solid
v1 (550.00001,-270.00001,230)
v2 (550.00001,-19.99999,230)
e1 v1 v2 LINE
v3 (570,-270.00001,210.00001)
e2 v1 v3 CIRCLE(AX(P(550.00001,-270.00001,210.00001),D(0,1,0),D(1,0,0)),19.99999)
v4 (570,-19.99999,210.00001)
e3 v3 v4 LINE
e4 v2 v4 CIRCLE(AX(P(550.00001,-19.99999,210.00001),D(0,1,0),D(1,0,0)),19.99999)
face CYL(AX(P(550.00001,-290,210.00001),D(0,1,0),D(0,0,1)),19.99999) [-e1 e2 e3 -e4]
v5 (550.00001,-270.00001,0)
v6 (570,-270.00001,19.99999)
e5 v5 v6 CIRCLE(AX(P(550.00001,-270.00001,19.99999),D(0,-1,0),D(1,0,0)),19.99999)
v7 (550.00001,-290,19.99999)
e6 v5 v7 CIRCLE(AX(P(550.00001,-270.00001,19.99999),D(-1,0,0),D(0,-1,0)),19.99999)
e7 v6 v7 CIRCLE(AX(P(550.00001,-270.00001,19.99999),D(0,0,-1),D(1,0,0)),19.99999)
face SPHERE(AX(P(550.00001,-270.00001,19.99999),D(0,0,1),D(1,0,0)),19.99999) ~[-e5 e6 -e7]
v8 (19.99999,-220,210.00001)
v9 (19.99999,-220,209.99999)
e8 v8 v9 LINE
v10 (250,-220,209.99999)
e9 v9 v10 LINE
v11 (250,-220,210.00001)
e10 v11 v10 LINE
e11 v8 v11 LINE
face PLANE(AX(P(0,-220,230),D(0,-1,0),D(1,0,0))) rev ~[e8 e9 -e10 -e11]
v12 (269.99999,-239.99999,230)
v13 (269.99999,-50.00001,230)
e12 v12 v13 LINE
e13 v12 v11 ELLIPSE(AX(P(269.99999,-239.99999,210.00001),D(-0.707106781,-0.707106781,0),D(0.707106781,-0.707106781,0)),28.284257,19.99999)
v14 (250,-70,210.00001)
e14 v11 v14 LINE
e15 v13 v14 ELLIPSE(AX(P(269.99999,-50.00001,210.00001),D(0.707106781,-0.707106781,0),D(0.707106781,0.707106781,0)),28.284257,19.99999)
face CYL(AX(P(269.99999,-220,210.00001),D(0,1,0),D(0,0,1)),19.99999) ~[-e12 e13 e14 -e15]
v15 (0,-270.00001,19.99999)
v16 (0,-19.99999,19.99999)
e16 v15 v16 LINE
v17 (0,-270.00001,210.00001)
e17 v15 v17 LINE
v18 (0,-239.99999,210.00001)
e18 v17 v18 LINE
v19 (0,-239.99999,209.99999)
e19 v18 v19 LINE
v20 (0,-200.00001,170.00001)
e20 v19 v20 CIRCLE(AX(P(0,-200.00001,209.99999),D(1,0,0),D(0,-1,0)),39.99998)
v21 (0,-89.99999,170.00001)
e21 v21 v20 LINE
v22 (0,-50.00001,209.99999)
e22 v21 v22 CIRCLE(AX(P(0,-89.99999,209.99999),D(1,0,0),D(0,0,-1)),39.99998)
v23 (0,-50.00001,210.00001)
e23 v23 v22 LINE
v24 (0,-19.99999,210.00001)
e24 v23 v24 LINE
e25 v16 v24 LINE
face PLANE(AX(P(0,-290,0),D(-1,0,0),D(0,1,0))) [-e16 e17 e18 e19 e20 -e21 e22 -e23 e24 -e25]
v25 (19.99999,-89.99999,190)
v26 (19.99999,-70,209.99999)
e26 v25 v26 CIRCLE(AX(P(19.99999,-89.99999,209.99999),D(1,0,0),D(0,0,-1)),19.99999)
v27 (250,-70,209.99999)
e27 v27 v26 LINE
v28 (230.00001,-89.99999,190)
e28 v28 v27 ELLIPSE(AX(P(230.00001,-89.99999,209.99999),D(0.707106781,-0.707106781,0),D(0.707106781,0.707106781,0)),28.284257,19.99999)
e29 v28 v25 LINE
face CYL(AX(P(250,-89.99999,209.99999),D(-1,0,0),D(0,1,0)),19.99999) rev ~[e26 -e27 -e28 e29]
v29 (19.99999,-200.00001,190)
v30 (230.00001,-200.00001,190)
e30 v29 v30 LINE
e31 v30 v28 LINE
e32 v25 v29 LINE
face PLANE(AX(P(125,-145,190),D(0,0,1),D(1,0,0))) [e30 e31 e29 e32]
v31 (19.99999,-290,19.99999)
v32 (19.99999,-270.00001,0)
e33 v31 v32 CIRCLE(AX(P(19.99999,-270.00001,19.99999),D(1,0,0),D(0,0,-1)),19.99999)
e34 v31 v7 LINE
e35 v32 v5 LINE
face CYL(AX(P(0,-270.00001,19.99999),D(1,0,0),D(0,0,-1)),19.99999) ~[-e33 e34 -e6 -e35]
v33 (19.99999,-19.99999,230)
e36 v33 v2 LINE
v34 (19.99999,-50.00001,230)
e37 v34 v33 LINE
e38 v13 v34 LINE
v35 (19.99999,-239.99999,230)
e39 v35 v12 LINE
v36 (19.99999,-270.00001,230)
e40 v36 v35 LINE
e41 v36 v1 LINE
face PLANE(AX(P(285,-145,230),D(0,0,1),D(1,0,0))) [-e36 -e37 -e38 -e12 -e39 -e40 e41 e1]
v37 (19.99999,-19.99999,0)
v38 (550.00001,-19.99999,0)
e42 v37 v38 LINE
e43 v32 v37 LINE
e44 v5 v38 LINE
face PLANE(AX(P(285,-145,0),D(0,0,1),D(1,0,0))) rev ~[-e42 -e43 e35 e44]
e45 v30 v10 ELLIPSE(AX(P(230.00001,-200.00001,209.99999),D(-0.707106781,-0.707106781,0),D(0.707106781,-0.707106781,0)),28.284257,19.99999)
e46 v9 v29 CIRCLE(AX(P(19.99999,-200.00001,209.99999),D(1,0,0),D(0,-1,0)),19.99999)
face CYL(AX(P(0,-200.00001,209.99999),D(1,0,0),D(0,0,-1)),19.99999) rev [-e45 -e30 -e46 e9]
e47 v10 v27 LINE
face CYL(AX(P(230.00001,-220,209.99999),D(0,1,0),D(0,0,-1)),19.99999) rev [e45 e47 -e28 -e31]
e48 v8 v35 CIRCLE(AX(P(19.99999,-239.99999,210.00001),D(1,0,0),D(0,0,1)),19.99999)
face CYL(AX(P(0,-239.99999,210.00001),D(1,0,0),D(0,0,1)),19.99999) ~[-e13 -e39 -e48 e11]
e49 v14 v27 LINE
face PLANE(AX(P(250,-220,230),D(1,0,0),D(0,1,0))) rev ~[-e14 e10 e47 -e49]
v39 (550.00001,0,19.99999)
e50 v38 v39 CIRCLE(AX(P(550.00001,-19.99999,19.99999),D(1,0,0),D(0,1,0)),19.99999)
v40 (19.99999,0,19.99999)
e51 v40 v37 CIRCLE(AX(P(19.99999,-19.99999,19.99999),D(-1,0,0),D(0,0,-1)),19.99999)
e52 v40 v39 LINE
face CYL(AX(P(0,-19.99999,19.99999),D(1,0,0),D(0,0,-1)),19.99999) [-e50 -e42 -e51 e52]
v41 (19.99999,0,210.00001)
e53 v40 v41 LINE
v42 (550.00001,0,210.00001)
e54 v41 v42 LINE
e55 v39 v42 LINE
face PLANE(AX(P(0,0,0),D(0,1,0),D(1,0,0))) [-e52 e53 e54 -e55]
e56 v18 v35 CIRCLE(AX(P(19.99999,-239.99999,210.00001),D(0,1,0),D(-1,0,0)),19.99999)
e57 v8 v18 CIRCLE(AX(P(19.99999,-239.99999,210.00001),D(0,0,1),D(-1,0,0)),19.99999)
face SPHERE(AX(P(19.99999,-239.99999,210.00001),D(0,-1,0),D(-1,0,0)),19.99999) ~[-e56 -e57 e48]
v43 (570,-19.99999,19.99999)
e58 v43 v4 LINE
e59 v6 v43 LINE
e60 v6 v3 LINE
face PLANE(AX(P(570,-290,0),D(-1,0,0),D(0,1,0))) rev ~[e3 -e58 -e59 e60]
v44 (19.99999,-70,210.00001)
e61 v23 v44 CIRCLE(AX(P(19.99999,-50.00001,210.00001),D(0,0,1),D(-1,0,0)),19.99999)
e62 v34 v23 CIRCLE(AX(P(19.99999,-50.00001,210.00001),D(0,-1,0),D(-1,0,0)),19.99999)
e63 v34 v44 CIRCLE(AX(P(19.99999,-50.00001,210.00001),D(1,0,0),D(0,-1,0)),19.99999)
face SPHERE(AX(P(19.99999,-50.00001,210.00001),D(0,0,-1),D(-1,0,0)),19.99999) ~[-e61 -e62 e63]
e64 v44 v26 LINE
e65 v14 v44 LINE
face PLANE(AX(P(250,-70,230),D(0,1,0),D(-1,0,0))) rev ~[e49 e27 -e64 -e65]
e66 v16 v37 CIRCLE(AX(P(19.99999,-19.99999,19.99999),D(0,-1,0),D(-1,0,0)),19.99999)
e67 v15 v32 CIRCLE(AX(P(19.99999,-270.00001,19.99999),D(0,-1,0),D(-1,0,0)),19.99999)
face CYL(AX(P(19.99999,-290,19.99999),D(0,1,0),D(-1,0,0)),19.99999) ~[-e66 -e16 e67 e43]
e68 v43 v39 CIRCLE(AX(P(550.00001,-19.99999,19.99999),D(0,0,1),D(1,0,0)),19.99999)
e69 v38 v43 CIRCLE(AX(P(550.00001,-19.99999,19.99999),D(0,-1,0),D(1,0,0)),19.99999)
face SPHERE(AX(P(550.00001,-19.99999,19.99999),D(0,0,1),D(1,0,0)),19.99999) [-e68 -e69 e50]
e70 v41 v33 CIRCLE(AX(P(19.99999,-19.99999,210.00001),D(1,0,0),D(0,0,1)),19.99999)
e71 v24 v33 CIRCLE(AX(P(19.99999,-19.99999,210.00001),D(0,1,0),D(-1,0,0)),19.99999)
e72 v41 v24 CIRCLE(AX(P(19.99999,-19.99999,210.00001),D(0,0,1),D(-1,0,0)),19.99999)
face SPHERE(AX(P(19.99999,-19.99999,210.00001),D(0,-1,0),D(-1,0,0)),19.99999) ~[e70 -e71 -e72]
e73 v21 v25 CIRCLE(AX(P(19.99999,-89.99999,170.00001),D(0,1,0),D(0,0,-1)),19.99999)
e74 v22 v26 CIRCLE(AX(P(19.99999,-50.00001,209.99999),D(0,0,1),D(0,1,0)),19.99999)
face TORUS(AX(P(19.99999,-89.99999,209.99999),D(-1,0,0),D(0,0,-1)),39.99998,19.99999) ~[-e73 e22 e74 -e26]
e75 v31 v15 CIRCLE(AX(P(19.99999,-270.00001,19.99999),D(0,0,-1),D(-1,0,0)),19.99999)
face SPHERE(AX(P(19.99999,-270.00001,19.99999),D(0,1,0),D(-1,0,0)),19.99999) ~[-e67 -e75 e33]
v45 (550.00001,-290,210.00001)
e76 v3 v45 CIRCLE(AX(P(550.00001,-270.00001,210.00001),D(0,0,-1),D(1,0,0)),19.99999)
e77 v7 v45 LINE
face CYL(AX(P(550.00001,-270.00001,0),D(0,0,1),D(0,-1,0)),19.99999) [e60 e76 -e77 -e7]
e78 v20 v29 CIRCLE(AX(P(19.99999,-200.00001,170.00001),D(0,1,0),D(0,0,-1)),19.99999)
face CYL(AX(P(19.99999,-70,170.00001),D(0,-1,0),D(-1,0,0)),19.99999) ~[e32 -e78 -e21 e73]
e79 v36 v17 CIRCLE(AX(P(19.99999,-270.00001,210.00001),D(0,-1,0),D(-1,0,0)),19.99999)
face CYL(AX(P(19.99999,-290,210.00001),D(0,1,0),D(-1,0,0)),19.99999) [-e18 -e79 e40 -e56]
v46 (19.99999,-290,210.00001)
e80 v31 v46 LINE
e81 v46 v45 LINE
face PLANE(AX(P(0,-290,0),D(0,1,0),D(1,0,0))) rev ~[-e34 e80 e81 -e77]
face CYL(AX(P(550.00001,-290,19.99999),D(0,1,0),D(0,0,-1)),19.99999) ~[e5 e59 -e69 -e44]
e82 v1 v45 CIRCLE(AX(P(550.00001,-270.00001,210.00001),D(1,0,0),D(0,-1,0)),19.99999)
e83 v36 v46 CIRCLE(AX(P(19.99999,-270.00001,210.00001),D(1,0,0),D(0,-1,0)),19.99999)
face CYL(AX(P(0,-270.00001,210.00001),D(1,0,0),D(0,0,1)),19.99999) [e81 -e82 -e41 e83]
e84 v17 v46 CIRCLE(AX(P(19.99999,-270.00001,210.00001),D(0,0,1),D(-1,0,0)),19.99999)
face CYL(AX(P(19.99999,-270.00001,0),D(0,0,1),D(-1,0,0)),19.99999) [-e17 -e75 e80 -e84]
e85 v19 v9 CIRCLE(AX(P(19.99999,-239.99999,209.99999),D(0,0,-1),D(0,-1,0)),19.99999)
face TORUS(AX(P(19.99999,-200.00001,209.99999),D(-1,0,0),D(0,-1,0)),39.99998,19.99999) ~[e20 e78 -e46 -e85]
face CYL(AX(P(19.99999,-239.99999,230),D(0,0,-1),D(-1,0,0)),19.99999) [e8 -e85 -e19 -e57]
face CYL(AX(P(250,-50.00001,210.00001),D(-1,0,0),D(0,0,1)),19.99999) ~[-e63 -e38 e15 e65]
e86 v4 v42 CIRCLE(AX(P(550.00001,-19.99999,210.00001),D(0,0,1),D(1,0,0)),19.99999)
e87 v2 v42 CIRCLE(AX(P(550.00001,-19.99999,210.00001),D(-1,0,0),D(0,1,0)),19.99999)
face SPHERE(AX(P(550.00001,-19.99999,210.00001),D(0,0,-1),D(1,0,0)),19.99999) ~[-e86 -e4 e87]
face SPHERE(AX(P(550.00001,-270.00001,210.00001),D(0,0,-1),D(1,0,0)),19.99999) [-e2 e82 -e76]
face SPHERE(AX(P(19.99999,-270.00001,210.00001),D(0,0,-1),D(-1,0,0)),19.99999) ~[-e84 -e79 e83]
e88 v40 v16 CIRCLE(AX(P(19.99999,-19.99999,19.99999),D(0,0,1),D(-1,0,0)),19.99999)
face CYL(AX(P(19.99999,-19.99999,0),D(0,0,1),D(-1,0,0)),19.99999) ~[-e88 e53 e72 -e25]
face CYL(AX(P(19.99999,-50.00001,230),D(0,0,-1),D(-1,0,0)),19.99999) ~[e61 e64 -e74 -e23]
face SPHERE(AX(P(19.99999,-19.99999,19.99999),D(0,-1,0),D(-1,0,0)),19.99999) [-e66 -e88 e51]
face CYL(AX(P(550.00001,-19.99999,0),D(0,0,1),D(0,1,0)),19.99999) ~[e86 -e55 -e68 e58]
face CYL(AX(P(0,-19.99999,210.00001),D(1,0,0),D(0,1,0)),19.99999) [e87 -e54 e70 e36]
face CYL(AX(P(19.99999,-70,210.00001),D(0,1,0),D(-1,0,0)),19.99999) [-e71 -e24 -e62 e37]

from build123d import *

# Parameters (mm, degrees)
F0_W     = 570
F0_H     = 290
F1_DEPTH = 230
F3_DEPTH = 40
F4_R     = 19.99999


# Not quite as in the source:
# - a fillet or chamfer is up to 0.001 mm smaller than in the source, because OpenCascade refuses the exact size
# - a feature of the source that left no trace in its solid (it failed there, or was rolled back) is left out


with BuildPart() as f1:
    # F0 (on Top) → F1 (new body)
    with BuildSketch(Plane.XY):
        with Locations((285, -145)):
            Rectangle(F0_W, F0_H)
    extrude(amount=F1_DEPTH)

    # F2 (on face) → F3 (cut)
    with BuildSketch(Plane.XY.offset(230)):
        Polygon((0, -220), (250, -220), (250, -145), (250, -70), (0, -70), (0, -145), align=None)
    extrude(amount=-F3_DEPTH, mode=Mode.SUBTRACT)

    # F4 (radius 20 in the source; OpenCascade refuses exactly that, so slightly less here)
    f4_edges = [f1.edges().sort_by_distance(p)[0] for p in [
        (0, -145, 0),
        (0, -290, 115),
        (0, -255, 230),
        (0, -220, 210),
        (0, -145, 190),
        (0, -70, 210),
        (0, -35, 230),
        (0, 0, 115),
        (570, -290, 115),
        (570, 0, 115),
        (570, -145, 0),
        (570, -145, 230),
        (285, -290, 0),
        (285, -290, 230),
        (285, 0, 0),
        (285, 0, 230),
        (125, -220, 190),
        (250, -145, 190),
        (125, -70, 190),
        (125, -220, 230),
        (250, -145, 230),
        (125, -70, 230),
    ]]
    fillet(f4_edges, radius=F4_R)


solid = f1.part
